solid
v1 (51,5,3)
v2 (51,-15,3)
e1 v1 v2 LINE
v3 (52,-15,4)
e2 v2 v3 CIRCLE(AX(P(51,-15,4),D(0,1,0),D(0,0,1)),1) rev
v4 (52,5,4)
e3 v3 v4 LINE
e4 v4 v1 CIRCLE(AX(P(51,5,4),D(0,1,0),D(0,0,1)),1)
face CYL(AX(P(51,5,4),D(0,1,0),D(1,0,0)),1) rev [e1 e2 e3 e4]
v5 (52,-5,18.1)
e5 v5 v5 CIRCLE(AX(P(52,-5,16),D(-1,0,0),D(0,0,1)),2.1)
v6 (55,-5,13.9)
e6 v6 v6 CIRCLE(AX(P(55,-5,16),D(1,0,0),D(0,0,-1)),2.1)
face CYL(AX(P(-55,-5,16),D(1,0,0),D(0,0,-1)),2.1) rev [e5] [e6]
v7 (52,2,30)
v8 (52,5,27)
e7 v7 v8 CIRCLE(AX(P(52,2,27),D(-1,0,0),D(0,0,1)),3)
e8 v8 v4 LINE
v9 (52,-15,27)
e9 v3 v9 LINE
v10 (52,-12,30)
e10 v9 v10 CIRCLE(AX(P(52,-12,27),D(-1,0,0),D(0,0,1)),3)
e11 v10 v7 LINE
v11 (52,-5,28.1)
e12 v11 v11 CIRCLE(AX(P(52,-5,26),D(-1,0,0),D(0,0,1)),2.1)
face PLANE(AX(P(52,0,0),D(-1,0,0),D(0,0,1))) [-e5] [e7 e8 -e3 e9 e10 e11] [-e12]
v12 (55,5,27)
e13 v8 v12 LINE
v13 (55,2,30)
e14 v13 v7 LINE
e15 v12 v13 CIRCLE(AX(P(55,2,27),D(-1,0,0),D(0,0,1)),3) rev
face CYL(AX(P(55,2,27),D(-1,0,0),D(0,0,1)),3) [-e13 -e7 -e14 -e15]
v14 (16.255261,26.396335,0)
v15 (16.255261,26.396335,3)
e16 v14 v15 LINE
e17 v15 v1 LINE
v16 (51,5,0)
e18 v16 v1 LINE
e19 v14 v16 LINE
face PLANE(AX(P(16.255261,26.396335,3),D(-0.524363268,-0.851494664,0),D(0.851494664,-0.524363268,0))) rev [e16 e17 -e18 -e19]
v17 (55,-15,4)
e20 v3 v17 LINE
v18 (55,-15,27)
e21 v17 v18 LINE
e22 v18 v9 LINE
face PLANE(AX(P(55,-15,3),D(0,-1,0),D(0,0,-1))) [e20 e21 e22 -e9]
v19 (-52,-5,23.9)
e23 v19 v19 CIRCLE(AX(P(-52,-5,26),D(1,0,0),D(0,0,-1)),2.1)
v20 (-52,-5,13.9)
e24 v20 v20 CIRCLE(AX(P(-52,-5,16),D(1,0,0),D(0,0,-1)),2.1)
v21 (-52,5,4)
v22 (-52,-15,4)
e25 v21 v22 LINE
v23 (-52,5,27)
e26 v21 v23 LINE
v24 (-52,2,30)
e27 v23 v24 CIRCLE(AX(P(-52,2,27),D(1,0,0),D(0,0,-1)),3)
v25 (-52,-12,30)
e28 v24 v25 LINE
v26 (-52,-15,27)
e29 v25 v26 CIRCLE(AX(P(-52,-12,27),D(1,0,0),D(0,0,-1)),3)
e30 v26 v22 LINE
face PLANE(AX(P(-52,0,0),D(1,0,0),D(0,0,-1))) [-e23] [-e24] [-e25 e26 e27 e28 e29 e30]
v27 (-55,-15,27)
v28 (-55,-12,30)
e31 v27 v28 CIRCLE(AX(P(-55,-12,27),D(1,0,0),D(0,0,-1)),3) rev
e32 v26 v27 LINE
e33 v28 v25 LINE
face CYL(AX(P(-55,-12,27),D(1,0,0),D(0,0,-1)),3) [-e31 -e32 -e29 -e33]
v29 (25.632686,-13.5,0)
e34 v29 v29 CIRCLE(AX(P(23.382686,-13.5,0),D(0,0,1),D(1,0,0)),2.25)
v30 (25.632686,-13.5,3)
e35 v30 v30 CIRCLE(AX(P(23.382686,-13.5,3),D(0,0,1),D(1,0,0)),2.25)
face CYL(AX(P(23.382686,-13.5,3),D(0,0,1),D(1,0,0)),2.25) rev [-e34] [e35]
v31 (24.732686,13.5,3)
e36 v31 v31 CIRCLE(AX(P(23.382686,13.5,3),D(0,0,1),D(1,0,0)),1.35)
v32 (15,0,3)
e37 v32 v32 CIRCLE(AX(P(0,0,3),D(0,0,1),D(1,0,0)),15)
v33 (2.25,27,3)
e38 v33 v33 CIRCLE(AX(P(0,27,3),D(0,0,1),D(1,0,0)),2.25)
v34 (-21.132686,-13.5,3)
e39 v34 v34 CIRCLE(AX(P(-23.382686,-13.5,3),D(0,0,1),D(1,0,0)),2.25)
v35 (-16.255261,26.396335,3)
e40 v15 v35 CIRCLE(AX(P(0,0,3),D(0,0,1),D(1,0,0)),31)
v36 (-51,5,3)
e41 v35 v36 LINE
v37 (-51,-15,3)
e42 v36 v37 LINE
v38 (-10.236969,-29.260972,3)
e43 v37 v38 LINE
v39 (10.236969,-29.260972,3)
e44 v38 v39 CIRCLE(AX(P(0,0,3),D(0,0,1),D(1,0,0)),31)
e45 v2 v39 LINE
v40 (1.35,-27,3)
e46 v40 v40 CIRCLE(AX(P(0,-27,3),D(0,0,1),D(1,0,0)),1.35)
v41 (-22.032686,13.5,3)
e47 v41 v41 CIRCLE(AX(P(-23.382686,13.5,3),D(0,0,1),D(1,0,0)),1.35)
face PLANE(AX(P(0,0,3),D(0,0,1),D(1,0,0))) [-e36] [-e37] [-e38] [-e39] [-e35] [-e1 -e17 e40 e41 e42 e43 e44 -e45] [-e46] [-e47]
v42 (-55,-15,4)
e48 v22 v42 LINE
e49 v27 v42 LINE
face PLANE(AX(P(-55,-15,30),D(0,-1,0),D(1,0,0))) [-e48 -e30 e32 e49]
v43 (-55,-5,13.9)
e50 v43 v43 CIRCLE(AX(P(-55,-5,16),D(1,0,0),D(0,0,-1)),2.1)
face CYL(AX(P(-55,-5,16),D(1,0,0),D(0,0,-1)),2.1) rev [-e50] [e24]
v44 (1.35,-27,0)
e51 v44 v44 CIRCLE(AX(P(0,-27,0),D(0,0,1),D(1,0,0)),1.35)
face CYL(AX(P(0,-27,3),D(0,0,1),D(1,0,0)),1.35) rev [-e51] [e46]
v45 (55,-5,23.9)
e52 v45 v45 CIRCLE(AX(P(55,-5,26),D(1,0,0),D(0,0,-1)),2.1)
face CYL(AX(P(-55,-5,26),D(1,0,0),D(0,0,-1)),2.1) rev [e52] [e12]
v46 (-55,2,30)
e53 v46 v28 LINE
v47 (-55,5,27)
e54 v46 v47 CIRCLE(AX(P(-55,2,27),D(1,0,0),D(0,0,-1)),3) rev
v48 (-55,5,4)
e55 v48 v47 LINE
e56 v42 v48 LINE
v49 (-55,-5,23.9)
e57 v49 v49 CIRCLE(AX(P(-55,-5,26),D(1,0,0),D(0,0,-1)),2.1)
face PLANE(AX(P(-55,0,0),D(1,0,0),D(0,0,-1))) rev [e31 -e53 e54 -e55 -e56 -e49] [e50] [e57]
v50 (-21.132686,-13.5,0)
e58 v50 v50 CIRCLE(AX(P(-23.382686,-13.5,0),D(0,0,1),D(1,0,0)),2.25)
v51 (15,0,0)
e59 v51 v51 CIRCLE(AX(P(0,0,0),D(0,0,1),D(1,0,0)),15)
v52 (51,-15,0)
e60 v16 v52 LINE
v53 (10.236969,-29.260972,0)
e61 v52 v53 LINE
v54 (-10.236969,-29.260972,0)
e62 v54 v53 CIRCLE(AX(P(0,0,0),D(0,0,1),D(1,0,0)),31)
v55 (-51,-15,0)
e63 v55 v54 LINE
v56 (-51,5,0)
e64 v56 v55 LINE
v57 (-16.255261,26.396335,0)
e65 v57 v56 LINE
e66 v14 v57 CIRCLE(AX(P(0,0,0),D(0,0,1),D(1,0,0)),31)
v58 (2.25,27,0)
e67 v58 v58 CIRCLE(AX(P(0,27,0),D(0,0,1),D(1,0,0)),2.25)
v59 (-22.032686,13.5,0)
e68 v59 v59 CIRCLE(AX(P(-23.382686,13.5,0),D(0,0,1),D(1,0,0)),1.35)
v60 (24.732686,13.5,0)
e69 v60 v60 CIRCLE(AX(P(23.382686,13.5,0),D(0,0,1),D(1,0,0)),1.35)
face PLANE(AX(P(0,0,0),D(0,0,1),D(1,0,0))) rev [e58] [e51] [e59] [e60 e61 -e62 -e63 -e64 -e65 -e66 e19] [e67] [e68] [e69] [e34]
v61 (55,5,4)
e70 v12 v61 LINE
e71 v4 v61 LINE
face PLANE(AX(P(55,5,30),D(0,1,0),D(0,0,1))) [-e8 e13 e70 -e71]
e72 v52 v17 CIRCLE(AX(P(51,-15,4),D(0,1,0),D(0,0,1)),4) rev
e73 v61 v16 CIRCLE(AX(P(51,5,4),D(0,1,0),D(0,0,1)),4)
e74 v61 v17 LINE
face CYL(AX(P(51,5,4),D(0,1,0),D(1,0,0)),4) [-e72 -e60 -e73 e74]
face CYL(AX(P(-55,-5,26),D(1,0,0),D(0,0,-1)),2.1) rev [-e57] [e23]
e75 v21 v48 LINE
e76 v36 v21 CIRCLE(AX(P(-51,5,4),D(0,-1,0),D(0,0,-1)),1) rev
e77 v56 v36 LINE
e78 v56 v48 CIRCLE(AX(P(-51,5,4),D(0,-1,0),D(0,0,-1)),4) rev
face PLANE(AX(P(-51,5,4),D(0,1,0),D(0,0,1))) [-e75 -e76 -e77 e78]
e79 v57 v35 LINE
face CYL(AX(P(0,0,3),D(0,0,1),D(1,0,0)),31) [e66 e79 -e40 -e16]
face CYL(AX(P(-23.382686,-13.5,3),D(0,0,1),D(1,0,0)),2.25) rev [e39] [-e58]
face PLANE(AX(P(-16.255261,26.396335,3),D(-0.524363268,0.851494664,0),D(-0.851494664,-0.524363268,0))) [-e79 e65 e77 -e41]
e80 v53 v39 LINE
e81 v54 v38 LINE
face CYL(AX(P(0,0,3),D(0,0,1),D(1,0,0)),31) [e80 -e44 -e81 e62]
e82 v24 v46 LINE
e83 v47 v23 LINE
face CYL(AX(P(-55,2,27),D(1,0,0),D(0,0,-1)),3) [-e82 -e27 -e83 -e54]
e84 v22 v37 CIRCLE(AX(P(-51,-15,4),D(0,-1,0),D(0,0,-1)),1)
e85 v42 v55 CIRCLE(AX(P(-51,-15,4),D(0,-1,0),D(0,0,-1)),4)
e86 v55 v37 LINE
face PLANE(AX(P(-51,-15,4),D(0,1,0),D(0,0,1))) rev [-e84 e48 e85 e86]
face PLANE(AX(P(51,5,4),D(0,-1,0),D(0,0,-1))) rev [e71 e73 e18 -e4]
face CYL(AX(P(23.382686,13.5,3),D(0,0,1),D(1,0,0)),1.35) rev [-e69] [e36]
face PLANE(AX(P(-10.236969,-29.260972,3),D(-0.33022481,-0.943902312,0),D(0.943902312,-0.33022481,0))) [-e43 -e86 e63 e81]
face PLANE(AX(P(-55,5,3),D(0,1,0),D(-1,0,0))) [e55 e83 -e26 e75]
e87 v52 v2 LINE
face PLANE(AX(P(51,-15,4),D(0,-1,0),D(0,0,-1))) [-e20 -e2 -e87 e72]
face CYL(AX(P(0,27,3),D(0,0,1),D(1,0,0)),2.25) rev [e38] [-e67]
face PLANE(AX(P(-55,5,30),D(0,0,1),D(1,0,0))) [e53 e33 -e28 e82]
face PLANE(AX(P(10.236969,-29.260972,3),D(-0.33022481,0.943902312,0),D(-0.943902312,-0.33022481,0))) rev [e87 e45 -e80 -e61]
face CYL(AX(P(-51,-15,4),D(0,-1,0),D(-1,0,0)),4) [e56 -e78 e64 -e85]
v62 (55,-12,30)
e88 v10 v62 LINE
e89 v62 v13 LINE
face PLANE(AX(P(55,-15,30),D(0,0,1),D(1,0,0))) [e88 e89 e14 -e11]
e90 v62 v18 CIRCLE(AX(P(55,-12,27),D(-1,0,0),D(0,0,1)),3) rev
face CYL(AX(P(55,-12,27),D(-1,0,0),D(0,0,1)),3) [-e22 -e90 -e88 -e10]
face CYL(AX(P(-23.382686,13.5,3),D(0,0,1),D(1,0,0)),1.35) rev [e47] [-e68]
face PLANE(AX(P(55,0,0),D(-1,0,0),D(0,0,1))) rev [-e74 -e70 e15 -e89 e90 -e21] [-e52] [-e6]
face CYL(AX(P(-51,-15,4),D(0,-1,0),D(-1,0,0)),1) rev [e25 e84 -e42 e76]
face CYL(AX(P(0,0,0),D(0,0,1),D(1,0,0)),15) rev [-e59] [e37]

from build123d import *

# Parameters (mm, degrees)
SKETCH_1_R                  = 31
SKETCH_1_R_2                = 2.25
SKETCH_1_R_3                = 1.35
EXTRUDE_1_DEPTH             = 3
EXTRUDE_START               = -3
EXTRUDE_2_DEPTH             = 3
SKETCH_7_R                  = 15
CUT_EXTRUDE_1_DEPTH         = 3
SM_EDGE_FLANGE_1_DEPTH      = 20
SM_EDGE_FLANGE_1_BEND_DEPTH = 20
SKETCH_14_R                 = 2.1
CUT_EXTRUDE_2_DEPTH         = 119.156675647
FILLET_1_R                  = 3


# Sheet-metal steps are written as plain solids
with BuildPart() as part:
    # Sketch 1 → 凸台-拉伸1 (new body)
    with BuildSketch(Plane.XY):
        Circle(SKETCH_1_R)
        with Locations((0, 27)):
            Circle(SKETCH_1_R_2, mode=Mode.SUBTRACT)
        with Locations((0, -27)):
            Circle(SKETCH_1_R_3, mode=Mode.SUBTRACT)
        with Locations((23.382685902, -13.5)):
            Circle(SKETCH_1_R_2, mode=Mode.SUBTRACT)
        with Locations((-23.382685902, 13.5)):
            Circle(SKETCH_1_R_3, mode=Mode.SUBTRACT)
        with Locations((-23.382685902, -13.5)):
            Circle(SKETCH_1_R_2, mode=Mode.SUBTRACT)
        with Locations((23.382685902, 13.5)):
            Circle(SKETCH_1_R_3, mode=Mode.SUBTRACT)
    extrude(amount=EXTRUDE_1_DEPTH)

    # Sketch 2 → 凸台-拉伸2 (add)
    with BuildSketch(Plane.XY.offset(3).offset(EXTRUDE_START)):
        with BuildLine():
            ThreePointArc((-10.236969115, -29.260971674), (-30.820342362, -3.332641094), (-16.255261315, 26.396334586))
            Line((-16.255261315, 26.396334586), (-51, 5))
            Line((-51, 5), (-51, -15))
            Line((-51, -15), (-10.236969115, -29.260971674))
        make_face()
        with BuildLine():
            Line((51, -15), (51, 5))
            Line((51, 5), (16.255261315, 26.396334586))
            ThreePointArc((16.255261315, 26.396334586), (27.063934496, 15.117653575), (31, 0))
            ThreePointArc((31, 0), (25.281871396, -17.939536747), (10.236969115, -29.260971674))
            Line((10.236969115, -29.260971674), (51, -15))
        make_face()
    extrude(amount=EXTRUDE_2_DEPTH)

    # 草图7 → 切除-拉伸1 (cut)
    with BuildSketch(Plane.XY.offset(3)):
        Circle(SKETCH_7_R)
    extrude(amount=-CUT_EXTRUDE_1_DEPTH, mode=Mode.SUBTRACT)

    # 边线-法兰1 section (across the edge) → 边线-法兰1 (add)
    with BuildSketch(Plane(origin=(-52, 5, 3), x_dir=(1, 0, 0), z_dir=(0, -1, 0))):
        with BuildLine():
            Line((-3, 1), (-3, 27))
            Line((-3, 27), (0, 27))
            Line((0, 27), (0, 1))
            ThreePointArc((0, 1), (0.292893219, 0.292893219), (1, 0))
            Line((1, 0), (1, -3))
            ThreePointArc((1, -3), (-1.828427125, -1.828427125), (-3, 1))
        make_face()
    extrude(amount=SM_EDGE_FLANGE_1_DEPTH)

    # 边线-法兰1 section 2 (across the edge) → 边线-法兰1 bend (add)
    with BuildSketch(Plane(origin=(52, -15, 3), x_dir=(-1, 0, 0), z_dir=(0, 1, 0))):
        with BuildLine():
            Line((-3, 1), (-3, 27))
            Line((-3, 27), (0, 27))
            Line((0, 27), (0, 1))
            ThreePointArc((0, 1), (0.292893219, 0.292893219), (1, 0))
            Line((1, 0), (1, -3))
            ThreePointArc((1, -3), (-1.828427125, -1.828427125), (-3, 1))
        make_face()
    extrude(amount=SM_EDGE_FLANGE_1_BEND_DEPTH)

    # 草图14 → 切除-拉伸2 (cut, through all)
    with BuildSketch(Plane(origin=(55, 0, 0), x_dir=(0, 0, -1), z_dir=(1, 0, 0))):
        with Locations((-16, -5)):
            Circle(SKETCH_14_R)
        with Locations((-26, -5)):
            Circle(SKETCH_14_R)
    extrude(amount=-CUT_EXTRUDE_2_DEPTH, mode=Mode.SUBTRACT)

    # 圆角1
    fillet_1_edges = [part.edges().sort_by_distance(p)[0] for p in [
        (-53.5, 5, 30),
        (-53.5, -15, 30),
        (53.5, -15, 30),
        (53.5, 5, 30),
    ]]
    fillet(fillet_1_edges, radius=FILLET_1_R)


solid = part.part
